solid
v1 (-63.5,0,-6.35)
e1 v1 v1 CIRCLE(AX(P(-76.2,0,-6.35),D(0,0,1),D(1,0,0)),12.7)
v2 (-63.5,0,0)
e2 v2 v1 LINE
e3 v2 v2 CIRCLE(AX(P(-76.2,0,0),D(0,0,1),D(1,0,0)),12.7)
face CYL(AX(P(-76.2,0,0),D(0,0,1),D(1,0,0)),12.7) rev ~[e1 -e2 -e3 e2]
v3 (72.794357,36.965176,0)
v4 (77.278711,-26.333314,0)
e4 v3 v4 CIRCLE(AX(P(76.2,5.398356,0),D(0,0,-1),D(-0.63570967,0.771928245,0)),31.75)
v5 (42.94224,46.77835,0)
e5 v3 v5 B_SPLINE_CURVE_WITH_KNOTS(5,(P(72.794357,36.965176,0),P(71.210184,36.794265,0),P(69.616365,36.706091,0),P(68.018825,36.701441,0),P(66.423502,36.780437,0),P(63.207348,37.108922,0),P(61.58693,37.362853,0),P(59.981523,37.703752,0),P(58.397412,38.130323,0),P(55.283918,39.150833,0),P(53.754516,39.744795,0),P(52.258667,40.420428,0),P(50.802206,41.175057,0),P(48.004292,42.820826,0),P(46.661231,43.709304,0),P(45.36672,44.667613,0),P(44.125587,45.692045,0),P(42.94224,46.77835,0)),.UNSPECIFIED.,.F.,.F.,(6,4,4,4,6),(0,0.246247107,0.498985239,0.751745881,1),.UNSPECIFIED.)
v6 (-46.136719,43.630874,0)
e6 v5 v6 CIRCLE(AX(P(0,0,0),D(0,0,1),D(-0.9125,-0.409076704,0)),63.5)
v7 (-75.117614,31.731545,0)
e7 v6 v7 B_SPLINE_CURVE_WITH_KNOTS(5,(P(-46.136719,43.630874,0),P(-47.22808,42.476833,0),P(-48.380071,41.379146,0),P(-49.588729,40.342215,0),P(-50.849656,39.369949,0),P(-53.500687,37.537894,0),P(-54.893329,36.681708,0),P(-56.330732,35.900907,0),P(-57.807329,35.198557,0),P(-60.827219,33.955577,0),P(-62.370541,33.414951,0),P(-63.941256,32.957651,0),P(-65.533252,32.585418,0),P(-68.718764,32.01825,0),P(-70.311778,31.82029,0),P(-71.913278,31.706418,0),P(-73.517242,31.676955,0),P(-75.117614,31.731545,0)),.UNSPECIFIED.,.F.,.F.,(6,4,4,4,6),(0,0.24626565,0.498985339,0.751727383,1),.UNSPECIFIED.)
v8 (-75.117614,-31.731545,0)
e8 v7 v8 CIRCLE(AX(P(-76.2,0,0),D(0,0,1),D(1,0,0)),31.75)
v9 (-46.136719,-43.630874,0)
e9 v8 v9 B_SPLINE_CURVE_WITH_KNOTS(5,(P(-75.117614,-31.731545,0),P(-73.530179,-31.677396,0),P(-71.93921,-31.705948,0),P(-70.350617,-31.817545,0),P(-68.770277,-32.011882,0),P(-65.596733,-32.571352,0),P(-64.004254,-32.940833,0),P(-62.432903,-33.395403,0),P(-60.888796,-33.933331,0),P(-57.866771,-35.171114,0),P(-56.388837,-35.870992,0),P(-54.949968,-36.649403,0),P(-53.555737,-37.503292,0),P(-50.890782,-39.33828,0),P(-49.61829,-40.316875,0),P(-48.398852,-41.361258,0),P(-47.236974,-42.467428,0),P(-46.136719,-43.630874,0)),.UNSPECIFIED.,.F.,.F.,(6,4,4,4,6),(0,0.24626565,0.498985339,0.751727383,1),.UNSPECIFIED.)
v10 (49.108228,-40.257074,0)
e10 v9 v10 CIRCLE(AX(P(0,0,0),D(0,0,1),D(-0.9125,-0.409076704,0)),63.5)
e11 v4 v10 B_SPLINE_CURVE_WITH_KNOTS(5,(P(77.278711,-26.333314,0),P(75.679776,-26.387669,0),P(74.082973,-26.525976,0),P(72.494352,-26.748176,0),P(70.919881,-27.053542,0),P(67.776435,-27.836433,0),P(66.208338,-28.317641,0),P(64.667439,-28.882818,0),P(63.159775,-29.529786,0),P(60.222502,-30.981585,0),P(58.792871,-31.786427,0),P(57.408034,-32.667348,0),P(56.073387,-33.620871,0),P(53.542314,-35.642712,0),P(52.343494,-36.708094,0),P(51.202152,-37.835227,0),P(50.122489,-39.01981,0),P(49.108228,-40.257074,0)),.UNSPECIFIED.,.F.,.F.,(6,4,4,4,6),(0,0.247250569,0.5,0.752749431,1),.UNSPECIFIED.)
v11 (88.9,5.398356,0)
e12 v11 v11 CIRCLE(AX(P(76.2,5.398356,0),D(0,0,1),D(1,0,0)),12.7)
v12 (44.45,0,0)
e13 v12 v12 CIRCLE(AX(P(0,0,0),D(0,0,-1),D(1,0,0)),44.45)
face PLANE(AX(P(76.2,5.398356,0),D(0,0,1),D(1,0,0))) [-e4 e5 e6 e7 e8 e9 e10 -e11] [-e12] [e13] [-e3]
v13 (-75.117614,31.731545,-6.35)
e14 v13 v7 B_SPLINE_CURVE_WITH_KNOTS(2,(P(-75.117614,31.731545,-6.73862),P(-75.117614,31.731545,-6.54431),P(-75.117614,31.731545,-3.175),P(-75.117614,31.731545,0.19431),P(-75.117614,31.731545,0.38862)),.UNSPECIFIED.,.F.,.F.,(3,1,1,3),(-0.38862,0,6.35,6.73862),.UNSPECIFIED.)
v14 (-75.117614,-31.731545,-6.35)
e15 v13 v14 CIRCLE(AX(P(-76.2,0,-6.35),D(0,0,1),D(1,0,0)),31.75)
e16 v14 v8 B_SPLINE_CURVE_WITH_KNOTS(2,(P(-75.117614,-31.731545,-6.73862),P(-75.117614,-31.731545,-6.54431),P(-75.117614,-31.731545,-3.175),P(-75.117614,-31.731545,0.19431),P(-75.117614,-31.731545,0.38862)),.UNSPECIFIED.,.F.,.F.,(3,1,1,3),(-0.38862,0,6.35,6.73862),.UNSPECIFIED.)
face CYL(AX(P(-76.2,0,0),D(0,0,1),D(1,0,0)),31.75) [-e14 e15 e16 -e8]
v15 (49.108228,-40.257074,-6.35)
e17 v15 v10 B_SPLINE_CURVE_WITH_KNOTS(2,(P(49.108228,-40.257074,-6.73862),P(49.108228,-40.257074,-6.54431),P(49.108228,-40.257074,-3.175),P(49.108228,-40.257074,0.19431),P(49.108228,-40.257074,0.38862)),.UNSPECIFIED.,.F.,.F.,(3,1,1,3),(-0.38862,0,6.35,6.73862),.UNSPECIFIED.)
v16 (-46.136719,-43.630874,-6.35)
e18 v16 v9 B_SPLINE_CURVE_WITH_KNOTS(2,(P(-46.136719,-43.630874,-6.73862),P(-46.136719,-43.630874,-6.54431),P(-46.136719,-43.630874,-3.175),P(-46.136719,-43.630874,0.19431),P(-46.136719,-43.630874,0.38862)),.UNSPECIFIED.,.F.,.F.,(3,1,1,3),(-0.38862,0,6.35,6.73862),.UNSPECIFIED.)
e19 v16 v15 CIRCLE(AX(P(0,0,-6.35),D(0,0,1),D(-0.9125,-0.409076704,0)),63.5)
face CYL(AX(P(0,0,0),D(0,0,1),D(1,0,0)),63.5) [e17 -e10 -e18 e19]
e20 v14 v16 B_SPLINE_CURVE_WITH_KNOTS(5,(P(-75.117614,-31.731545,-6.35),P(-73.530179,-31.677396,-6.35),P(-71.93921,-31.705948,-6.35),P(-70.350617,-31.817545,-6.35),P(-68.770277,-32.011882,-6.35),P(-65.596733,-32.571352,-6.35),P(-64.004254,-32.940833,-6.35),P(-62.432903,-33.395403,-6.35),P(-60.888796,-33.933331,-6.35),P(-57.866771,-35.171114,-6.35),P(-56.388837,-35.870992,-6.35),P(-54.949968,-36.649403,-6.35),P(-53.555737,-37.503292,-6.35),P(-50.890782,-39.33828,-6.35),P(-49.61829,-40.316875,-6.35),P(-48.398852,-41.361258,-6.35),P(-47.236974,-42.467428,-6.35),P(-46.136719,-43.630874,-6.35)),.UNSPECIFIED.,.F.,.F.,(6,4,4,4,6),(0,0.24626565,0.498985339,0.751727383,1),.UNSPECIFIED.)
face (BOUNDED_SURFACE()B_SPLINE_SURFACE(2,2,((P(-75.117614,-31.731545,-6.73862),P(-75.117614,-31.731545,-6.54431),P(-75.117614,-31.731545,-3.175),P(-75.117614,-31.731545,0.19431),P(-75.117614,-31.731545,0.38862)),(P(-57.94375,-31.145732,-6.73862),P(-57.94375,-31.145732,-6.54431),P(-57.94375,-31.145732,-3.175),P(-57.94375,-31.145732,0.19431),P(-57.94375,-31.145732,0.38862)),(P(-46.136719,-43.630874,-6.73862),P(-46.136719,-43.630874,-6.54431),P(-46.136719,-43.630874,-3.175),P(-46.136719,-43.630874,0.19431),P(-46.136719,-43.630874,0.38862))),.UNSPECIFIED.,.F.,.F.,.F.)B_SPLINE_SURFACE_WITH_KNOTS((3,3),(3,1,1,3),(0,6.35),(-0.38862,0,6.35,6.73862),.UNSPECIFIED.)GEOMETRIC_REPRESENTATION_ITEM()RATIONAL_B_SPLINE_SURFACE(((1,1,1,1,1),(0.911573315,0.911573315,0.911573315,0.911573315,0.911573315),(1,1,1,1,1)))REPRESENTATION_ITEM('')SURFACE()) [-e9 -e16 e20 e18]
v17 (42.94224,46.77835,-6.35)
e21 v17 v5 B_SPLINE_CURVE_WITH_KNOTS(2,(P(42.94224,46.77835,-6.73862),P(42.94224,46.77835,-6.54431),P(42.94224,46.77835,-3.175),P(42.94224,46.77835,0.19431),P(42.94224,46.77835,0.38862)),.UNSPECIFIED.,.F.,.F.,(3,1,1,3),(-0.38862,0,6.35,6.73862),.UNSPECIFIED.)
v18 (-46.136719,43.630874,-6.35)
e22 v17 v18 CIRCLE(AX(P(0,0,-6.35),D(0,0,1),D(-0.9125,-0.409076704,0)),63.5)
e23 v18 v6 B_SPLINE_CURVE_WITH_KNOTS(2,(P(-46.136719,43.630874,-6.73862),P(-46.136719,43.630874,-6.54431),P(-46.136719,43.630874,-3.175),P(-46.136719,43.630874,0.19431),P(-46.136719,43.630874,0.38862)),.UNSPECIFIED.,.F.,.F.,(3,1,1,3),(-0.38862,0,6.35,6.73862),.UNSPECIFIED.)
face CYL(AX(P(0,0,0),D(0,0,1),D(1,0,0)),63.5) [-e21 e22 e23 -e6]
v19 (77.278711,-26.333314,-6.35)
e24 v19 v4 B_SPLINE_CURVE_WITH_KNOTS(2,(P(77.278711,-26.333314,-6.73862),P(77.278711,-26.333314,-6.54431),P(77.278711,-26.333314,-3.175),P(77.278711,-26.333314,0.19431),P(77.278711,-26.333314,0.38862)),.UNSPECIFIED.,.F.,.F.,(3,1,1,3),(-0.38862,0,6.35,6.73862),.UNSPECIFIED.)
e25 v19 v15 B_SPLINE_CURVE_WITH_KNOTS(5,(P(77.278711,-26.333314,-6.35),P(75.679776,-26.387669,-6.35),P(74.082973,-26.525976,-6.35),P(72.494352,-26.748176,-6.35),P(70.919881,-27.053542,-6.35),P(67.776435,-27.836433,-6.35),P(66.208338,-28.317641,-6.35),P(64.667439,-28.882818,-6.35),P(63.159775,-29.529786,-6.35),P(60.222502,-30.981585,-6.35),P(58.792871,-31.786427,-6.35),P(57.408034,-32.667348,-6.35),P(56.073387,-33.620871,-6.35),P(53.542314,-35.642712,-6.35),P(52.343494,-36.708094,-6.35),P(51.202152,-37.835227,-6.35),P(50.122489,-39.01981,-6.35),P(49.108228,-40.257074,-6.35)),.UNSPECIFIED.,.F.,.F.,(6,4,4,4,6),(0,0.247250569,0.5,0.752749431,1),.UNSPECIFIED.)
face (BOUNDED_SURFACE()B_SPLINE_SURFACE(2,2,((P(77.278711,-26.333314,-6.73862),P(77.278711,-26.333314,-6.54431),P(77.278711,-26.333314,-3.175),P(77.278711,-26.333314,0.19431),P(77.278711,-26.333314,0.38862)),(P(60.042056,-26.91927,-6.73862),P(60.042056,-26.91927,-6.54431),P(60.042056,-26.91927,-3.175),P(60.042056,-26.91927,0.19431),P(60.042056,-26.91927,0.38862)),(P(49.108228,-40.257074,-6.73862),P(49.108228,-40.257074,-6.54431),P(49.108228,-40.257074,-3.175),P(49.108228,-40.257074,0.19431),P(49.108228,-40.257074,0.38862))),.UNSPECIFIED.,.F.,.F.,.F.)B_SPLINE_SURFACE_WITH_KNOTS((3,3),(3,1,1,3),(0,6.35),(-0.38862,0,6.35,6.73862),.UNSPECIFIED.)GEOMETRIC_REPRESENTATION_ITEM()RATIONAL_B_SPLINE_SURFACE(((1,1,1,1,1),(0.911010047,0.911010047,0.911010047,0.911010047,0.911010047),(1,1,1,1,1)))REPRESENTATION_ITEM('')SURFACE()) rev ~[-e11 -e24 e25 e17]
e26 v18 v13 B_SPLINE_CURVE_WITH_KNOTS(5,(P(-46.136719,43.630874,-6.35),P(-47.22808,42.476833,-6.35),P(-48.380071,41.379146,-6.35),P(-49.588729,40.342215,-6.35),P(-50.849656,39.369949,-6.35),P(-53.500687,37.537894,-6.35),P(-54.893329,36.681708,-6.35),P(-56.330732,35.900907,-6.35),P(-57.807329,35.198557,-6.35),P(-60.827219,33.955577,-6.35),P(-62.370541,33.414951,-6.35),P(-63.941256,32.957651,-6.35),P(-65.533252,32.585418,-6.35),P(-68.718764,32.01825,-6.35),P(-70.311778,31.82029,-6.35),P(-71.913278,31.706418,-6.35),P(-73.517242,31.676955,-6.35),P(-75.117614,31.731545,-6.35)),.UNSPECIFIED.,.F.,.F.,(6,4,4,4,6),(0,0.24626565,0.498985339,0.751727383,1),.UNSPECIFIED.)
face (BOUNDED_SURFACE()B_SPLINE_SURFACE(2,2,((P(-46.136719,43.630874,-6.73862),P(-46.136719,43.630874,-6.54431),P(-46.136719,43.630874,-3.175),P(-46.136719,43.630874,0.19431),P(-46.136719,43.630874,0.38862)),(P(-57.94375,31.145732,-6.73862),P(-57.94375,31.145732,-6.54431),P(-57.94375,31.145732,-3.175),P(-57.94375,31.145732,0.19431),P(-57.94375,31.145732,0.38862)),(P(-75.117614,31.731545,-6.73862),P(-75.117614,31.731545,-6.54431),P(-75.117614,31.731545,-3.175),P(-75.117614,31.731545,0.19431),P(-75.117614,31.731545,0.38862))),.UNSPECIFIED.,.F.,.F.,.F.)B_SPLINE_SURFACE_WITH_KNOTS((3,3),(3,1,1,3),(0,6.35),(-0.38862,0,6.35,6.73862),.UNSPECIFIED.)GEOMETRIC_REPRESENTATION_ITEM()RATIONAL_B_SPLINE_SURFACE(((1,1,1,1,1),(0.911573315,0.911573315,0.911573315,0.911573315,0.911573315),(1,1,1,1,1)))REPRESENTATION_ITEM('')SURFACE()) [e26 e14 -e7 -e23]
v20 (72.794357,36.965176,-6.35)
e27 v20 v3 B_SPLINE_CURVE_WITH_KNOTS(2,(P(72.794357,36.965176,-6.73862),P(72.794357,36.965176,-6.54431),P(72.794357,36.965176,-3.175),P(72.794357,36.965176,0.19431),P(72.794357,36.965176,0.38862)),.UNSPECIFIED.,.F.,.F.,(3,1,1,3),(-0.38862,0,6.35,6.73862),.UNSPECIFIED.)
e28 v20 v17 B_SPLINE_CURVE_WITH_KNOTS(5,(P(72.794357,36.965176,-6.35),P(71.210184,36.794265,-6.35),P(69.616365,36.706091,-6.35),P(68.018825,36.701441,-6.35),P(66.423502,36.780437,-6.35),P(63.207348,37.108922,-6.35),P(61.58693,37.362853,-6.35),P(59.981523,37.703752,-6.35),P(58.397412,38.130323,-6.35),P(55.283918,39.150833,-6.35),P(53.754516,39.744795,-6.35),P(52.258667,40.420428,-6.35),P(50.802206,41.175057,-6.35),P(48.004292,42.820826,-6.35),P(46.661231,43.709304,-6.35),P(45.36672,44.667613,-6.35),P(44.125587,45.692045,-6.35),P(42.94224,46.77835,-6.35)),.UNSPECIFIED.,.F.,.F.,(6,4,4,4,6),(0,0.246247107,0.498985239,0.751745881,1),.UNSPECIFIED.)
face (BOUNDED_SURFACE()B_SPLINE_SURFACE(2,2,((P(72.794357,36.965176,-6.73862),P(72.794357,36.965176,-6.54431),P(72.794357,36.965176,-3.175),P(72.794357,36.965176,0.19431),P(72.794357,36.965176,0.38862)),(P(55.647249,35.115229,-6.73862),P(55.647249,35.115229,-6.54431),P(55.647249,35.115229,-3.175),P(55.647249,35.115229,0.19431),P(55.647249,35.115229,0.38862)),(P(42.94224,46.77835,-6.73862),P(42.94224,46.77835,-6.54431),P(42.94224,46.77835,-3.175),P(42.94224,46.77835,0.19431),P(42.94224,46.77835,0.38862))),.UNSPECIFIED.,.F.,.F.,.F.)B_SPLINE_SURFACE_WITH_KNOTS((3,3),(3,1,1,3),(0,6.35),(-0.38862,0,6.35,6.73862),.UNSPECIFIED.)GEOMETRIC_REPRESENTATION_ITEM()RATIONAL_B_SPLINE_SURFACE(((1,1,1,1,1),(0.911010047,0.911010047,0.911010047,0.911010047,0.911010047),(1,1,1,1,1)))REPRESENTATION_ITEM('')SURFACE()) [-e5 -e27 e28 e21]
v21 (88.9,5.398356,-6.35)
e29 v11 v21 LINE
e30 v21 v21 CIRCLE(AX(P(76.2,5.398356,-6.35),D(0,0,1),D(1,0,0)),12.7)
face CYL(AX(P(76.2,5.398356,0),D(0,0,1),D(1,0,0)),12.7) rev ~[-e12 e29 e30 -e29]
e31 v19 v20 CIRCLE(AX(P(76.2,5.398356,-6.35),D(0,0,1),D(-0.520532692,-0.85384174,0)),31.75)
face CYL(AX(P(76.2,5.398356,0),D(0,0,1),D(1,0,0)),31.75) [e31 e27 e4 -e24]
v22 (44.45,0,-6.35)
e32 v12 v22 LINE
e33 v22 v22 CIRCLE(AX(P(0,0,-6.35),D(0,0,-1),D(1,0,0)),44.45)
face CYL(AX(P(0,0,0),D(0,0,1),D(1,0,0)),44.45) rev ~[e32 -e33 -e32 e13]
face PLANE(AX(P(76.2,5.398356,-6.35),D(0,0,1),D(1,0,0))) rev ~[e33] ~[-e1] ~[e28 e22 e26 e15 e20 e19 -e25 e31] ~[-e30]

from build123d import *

# Parameters (mm, degrees)
F0_R     = 63.5
F0_R_2   = 44.45
F1_DEPTH = 6.35
F2_R     = 31.75
F2_R_2   = 12.7
F3_DEPTH = 6.35
F4_R     = 31.75
F4_R_2   = 12.7
F5_DEPTH = 6.35
F8_R     = 38.1


# Not quite as in the source:
# - two fillets or chamfers of one size are made in one step


with BuildPart() as f1:
    # F0 (on Top) → F1 (new body)
    with BuildSketch(Plane.XY):
        Circle(F0_R)
        Circle(F0_R_2, mode=Mode.SUBTRACT)
    extrude(amount=-F1_DEPTH)

    # F2 (on Top) → F3 (join)
    with BuildSketch(Plane.XY):
        with Locations((-76.2, 0)):
            Circle(F2_R)
        with Locations((-76.2, 0)):
            Circle(F2_R_2, mode=Mode.SUBTRACT)
    extrude(amount=-F3_DEPTH)

    # F4 (on Top) → F5 (join)
    with BuildSketch(Plane.XY):
        with Locations((76.2, 5.3983563557)):
            Circle(F4_R)
        with Locations((76.2, 5.3983563557)):
            Circle(F4_R_2, mode=Mode.SUBTRACT)
    extrude(amount=-F5_DEPTH)

    # F6: union 

    # F7: union 

    # F8
    f8_edges = [f1.edges().sort_by_distance(p)[0] for p in [
        (-57.94375, 25.976371, -3.175),
        (56.016218, 29.907078, -3.175),
        (59.673087, -21.711119, -3.175),
        (-57.94375, -25.976371, -3.175),
    ]]
    fillet(f8_edges, radius=F8_R)


solid = f1.part
